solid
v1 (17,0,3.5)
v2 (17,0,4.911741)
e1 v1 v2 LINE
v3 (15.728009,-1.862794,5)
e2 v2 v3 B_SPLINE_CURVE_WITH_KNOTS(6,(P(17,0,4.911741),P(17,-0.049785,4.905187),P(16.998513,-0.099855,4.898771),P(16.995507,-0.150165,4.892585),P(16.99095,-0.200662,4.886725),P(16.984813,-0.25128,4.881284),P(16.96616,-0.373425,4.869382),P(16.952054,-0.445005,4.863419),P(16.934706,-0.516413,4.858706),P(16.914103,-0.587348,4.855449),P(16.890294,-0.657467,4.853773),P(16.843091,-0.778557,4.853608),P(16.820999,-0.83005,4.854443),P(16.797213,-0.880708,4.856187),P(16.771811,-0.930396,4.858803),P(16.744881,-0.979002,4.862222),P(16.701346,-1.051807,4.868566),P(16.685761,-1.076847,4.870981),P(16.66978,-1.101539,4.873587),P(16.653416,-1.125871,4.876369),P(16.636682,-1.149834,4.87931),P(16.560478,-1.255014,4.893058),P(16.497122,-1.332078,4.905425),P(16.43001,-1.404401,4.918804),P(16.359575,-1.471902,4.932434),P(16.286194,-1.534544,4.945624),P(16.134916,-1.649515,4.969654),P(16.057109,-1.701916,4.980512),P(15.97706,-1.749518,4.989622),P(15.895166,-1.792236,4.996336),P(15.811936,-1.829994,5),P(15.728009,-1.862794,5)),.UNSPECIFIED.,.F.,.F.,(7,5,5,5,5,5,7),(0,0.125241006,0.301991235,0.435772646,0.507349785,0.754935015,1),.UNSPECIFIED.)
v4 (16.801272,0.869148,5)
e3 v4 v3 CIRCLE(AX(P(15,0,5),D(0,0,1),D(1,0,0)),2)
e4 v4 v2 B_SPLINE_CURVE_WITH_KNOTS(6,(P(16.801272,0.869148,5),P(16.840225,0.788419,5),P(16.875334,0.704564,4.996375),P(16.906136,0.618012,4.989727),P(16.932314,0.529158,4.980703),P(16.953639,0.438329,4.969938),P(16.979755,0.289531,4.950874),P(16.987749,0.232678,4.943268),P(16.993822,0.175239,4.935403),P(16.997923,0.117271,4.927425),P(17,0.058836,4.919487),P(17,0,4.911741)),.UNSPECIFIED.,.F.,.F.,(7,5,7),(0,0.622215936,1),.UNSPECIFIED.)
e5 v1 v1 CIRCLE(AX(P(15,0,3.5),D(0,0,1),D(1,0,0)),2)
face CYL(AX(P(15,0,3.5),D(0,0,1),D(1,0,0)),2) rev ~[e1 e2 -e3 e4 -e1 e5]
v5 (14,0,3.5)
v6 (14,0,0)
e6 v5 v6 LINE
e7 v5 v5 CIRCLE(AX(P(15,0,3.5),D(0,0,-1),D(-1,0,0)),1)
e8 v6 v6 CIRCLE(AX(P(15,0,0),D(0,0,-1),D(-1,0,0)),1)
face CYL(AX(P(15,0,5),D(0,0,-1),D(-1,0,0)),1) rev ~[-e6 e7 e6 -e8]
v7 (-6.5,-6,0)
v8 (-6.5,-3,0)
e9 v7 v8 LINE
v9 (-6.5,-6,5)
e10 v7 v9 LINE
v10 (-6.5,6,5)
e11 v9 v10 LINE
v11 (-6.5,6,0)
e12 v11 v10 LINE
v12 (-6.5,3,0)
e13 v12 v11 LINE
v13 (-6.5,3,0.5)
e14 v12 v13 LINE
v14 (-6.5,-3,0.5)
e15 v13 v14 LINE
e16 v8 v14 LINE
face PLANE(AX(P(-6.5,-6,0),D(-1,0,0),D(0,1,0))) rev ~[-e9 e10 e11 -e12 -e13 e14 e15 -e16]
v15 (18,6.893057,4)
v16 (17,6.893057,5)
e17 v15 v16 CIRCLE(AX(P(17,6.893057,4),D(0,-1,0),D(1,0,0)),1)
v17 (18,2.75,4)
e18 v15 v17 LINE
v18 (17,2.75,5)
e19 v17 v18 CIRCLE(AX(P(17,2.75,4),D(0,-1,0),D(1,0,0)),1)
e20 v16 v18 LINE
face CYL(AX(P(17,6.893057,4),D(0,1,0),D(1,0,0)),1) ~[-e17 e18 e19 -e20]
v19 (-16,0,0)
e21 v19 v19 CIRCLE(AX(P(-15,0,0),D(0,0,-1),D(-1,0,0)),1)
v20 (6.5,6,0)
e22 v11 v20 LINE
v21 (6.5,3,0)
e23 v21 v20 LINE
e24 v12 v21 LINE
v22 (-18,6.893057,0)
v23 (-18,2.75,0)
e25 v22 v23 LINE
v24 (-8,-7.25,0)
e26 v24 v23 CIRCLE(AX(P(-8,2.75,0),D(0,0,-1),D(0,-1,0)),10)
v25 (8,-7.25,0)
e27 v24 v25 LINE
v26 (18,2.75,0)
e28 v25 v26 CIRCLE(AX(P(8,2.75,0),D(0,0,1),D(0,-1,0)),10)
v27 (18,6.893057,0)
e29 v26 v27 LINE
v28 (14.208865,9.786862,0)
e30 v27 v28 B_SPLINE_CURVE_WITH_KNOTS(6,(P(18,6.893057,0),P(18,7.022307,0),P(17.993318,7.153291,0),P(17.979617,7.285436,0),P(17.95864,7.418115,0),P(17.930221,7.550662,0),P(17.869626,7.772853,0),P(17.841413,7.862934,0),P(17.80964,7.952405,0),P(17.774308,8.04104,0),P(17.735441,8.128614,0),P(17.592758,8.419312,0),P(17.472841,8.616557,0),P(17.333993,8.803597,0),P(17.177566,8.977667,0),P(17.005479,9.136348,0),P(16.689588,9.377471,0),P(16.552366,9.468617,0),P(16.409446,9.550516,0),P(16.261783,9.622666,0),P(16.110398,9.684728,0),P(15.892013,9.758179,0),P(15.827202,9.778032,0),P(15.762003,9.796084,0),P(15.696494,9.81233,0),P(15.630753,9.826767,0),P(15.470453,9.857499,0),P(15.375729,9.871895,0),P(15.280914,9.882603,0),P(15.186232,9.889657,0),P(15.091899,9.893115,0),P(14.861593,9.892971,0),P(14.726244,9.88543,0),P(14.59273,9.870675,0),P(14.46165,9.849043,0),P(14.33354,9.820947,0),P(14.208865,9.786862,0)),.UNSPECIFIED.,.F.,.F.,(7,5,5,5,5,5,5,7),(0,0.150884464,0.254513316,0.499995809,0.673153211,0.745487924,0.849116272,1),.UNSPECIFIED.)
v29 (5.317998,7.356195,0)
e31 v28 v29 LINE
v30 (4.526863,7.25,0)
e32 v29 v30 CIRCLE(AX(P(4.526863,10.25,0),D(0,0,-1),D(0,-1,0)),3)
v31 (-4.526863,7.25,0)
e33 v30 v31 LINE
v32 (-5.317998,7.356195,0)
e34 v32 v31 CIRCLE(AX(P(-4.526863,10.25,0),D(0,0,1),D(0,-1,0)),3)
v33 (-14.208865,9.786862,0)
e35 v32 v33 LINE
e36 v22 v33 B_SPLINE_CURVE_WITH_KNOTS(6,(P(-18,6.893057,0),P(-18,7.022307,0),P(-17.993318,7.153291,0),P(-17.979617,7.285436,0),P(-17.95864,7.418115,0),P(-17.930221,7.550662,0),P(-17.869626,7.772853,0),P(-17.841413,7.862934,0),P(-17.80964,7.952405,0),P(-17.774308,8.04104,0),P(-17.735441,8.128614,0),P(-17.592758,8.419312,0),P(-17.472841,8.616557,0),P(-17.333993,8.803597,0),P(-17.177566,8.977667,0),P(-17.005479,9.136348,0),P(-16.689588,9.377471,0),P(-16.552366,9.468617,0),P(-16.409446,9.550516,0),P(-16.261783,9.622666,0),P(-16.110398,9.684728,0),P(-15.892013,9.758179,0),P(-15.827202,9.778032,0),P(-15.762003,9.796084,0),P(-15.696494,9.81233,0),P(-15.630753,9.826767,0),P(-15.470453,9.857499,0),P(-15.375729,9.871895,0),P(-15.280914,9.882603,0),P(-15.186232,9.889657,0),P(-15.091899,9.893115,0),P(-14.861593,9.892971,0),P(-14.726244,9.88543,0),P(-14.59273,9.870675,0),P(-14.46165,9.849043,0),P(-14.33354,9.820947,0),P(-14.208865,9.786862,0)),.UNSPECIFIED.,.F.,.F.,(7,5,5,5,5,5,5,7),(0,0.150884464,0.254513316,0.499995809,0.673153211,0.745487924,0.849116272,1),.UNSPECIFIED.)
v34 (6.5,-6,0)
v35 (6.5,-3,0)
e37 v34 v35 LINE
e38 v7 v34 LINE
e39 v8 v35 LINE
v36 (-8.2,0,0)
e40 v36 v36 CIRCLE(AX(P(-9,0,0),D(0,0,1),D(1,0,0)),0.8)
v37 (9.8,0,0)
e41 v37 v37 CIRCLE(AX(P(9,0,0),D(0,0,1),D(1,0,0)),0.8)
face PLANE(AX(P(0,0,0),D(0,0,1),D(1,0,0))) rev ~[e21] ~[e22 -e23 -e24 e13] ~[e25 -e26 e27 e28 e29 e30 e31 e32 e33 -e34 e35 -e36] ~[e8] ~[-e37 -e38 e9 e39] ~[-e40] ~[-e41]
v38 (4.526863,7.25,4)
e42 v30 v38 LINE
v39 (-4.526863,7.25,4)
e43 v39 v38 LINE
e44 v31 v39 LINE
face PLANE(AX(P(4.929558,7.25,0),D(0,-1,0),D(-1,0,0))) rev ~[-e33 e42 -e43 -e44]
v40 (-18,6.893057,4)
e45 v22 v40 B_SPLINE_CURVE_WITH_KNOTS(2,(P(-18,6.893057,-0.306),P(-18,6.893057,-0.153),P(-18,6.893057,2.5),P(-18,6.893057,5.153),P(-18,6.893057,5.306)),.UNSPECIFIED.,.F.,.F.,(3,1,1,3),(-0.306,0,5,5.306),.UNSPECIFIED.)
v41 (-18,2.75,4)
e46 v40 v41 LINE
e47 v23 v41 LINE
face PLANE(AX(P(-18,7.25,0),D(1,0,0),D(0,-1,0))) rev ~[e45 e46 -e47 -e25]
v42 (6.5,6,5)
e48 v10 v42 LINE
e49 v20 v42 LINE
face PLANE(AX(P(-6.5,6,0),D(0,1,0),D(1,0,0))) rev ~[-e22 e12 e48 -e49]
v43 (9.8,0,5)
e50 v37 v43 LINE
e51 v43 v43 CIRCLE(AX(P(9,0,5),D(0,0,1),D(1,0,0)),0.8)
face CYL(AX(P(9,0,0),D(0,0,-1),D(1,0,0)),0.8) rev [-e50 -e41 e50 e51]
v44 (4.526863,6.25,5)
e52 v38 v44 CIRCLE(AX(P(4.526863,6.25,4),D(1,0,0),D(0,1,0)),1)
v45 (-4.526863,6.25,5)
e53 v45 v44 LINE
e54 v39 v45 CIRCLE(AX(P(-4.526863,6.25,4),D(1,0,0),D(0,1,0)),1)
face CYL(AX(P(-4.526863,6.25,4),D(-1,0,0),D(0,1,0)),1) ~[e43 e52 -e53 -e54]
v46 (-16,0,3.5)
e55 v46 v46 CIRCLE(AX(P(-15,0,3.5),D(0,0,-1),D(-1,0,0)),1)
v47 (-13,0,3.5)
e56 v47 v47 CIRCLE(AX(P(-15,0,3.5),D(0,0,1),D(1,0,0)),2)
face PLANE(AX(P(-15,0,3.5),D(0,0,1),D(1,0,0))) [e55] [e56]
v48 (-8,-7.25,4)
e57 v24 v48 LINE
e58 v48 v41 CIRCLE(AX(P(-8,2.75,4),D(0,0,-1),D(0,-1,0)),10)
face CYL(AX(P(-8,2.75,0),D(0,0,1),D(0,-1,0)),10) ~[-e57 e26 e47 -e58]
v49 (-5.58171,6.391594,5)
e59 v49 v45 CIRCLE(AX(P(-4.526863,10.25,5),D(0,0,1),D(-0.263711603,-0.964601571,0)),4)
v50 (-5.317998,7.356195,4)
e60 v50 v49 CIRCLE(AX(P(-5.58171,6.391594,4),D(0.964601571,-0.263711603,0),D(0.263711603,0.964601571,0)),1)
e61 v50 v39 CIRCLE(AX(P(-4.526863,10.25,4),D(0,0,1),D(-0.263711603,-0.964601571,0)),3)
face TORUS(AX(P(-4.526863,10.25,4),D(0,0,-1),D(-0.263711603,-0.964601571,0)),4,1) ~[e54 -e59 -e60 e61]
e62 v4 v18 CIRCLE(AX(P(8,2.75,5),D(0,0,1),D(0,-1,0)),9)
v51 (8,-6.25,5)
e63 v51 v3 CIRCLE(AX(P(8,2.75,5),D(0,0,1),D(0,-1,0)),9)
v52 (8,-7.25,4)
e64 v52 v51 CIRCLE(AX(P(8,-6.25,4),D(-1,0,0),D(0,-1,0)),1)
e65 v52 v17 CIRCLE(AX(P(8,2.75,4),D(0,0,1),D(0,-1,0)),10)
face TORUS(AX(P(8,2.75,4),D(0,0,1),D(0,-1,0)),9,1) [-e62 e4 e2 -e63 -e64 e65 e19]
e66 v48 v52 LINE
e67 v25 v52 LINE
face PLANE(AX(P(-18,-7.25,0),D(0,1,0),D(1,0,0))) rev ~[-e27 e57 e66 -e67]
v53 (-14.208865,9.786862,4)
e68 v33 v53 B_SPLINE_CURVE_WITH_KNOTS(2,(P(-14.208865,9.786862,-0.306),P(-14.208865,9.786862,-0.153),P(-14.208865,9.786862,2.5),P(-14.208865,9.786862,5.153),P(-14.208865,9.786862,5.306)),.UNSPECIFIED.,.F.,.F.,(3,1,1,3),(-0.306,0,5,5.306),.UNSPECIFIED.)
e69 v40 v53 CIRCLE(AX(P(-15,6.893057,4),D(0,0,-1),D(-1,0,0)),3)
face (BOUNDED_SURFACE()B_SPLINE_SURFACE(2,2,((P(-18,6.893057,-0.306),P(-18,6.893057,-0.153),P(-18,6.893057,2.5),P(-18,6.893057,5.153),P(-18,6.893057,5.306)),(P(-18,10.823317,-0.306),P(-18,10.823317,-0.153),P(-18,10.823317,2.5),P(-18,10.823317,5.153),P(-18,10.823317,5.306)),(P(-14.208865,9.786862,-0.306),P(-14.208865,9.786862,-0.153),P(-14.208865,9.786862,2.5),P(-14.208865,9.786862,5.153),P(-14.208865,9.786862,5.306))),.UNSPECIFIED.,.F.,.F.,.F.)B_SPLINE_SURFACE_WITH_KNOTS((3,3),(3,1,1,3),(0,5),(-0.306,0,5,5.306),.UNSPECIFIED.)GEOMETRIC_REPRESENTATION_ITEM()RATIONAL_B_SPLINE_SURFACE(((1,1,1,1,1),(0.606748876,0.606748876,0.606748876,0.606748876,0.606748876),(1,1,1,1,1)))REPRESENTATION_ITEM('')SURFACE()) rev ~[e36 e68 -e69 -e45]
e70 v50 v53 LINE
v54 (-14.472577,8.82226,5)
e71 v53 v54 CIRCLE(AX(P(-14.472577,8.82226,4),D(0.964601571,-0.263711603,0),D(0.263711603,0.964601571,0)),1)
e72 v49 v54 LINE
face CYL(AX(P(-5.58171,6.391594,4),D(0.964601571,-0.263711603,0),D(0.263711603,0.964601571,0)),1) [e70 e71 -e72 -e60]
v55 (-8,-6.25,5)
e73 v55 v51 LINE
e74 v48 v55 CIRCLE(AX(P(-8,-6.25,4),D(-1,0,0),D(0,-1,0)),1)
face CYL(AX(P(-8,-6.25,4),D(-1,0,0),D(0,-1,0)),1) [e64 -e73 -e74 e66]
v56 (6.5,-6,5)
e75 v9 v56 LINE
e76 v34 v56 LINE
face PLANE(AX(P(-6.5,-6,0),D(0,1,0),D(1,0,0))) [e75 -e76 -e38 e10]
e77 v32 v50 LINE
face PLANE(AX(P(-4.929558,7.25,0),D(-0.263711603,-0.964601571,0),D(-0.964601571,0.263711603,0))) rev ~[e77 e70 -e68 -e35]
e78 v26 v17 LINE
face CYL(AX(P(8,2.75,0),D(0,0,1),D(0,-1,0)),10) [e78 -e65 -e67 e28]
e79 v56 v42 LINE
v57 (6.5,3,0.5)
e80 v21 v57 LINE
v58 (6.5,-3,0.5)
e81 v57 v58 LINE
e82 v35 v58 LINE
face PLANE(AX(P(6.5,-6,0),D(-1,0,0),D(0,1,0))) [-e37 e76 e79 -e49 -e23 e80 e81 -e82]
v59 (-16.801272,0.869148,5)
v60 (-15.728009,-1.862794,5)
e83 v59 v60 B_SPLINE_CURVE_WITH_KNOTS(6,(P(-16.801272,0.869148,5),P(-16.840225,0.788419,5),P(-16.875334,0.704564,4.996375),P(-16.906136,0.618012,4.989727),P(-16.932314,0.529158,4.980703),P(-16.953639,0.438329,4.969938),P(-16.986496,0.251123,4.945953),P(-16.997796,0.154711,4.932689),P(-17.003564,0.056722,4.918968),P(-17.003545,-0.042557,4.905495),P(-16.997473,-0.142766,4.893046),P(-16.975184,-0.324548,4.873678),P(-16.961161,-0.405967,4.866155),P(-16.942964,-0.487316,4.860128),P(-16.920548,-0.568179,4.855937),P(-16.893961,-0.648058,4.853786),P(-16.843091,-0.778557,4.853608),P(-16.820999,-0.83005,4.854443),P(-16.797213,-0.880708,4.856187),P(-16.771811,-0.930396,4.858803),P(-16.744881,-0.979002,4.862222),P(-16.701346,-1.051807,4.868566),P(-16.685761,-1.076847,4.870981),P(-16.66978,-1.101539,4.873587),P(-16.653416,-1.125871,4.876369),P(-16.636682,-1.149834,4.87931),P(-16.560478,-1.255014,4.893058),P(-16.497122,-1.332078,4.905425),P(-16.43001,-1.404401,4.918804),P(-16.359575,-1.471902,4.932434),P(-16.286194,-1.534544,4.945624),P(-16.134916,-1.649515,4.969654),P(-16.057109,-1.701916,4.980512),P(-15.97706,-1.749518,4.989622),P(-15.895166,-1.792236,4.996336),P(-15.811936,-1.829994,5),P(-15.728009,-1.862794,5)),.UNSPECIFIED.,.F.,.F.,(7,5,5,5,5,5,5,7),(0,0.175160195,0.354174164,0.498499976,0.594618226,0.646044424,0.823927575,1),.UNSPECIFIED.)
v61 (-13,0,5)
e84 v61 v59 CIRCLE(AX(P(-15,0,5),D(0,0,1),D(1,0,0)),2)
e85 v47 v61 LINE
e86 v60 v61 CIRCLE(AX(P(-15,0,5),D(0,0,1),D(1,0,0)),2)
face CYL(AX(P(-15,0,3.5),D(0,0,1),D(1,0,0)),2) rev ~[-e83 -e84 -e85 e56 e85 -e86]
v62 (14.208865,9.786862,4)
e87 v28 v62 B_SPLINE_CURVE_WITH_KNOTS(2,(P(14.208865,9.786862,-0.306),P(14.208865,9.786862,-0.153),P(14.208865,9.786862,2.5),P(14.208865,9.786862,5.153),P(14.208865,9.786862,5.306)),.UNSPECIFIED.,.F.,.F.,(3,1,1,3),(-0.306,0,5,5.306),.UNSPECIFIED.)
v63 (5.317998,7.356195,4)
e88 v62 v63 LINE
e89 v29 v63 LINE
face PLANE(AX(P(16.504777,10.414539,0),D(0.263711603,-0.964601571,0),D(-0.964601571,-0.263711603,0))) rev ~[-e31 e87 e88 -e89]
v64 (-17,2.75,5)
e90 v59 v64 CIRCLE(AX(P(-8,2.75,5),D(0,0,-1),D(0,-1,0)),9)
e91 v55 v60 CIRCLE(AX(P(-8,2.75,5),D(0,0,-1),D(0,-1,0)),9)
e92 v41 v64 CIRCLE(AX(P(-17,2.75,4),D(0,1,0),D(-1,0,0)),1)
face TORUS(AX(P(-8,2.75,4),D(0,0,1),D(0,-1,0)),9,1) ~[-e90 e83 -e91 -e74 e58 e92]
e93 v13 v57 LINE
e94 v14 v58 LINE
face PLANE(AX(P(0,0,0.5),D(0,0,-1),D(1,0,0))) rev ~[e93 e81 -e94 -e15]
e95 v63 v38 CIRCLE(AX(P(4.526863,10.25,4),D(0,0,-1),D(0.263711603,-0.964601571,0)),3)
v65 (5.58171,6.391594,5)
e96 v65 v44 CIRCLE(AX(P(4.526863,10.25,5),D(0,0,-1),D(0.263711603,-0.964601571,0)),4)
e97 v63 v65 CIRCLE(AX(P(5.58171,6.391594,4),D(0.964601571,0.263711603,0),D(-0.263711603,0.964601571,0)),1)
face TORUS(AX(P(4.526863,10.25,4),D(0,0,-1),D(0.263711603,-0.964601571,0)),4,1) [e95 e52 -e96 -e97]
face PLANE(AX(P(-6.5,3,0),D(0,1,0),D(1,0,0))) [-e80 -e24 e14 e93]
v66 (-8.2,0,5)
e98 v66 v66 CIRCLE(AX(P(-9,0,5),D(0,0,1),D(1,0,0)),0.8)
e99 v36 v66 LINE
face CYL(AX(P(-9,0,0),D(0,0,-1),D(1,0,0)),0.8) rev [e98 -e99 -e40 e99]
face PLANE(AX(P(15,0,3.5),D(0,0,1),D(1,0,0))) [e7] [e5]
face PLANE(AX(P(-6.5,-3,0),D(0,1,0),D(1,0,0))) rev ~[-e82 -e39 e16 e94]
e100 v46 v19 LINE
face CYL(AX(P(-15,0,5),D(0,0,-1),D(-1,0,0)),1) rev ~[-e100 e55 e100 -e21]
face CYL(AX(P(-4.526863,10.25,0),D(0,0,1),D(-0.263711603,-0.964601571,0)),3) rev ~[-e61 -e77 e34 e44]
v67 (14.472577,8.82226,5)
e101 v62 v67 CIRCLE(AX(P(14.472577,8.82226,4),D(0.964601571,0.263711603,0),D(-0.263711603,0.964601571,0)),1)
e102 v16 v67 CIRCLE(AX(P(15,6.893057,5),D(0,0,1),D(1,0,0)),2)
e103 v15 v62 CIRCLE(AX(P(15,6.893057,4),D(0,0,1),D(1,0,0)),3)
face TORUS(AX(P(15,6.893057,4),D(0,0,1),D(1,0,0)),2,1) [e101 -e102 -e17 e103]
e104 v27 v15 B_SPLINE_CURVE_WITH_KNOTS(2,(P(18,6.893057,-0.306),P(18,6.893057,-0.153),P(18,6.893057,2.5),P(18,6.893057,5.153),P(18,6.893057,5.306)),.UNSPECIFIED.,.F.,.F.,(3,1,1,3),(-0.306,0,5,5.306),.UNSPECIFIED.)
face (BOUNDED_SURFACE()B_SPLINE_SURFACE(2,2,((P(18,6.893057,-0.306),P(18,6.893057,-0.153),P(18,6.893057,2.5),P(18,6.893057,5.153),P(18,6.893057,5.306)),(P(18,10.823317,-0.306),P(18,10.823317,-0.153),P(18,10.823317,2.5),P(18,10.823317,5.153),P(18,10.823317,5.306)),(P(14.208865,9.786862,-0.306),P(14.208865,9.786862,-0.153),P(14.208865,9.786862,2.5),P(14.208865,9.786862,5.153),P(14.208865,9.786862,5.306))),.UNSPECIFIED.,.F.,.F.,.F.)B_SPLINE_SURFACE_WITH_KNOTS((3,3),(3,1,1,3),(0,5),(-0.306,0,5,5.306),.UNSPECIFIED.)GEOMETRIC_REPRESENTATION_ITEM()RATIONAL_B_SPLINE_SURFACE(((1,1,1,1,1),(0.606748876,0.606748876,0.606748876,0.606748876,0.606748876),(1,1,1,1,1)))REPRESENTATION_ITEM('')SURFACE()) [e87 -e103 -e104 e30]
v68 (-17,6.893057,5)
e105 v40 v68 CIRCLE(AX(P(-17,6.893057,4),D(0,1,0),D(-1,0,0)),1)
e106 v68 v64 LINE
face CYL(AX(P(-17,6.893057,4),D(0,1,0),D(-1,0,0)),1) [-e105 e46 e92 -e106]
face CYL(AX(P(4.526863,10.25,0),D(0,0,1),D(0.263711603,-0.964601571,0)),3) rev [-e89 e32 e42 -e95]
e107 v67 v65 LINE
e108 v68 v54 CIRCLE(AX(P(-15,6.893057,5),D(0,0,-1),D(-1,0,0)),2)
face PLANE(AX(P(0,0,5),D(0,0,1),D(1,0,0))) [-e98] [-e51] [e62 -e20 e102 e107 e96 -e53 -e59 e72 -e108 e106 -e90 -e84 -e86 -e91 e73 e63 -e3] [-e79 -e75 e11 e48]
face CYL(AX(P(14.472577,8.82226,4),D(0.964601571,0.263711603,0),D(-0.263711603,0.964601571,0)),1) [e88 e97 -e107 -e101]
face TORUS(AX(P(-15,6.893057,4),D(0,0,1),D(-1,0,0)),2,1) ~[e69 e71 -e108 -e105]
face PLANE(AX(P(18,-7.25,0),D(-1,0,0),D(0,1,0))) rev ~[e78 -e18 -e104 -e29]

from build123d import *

# Parameters (mm, degrees)
F0_R           = 0.8
F0_W           = 13
F0_H           = 12
F1_DEPTH       = 5
F2_W           = 13
F2_H           = 6
F3_DEPTH       = 0.5
F5_D           = 2
F5_DEPTH       = 20
F5_CBORE_D     = 4
F5_CBORE_DEPTH = 1.5
F5_TIP         = 0.600860619
F6_R           = 10
F7_R           = 3
F8_T1_DEPTH    = 4.1430571099
F8_T3_DEPTH    = 9.217139142
F8_T5_DEPTH    = 16
F8_T7_DEPTH    = 9.0537269763
F8_T9_DEPTH    = 9.217139142
F8_T12_ANGLE   = 90
F8_T14_ANGLE   = 105.2904097565
F8_T16_ANGLE   = 90
F8_T18_ANGLE   = 15.2904100724
F8_T20_ANGLE   = 15.2904100724
F8_T22_ANGLE   = 105.2904094573


# Not quite as in the source:
# - a fillet or chamfer that OpenCascade refuses, or shapes differently, is made with other operations: its cross-section is extruded or revolved along the edge and cut away or added


with BuildPart() as f1:
    # F0 (on Top) → F1 (new body)
    with BuildSketch(Plane.XY):
        Polygon((-18, -7.25), (18, -7.25), (18, 7.25), (4.9295582736, 7.25), (-4.9295582736, 7.25), (-18, 7.25), align=None)
        with Locations((-9, 0)):
            Circle(F0_R, mode=Mode.SUBTRACT)
        Rectangle(F0_W, F0_H, mode=Mode.SUBTRACT)
        with Locations((9, 0)):
            Circle(F0_R, mode=Mode.SUBTRACT)
        with BuildLine():
            Line((4.9295582736, 7.25), (18, 7.25))
            ThreePointArc((18, 7.25), (17.6073787038, 9), (16.5047771245, 10.4145392323))
            Line((16.5047771245, 10.4145392323), (4.9295582736, 7.25))
        make_face()
        with BuildLine():
            ThreePointArc((-16.5047771245, 10.4145392323), (-17.6073787038, 9), (-18, 7.25))
            Line((-18, 7.25), (-4.9295582736, 7.25))
            Line((-4.9295582736, 7.25), (-16.5047771245, 10.4145392323))
        make_face()
    extrude(amount=F1_DEPTH)

    # F2 (on face) → F3 (join)
    with BuildSketch(Plane(origin=(0, 0, 0), x_dir=(1, 0, 0), z_dir=(0, 0, -1))):
        Rectangle(F2_W, F2_H)
    extrude(amount=-F3_DEPTH)

    # F5
    with Locations(Plane.XY.offset(5)):
        with Locations((-15, 0), (15, 0)):
            CounterBoreHole(F5_D / 2, F5_CBORE_D / 2, F5_CBORE_DEPTH, depth=F5_DEPTH)
            with Locations((0, 0, -(F5_DEPTH + F5_TIP / 2))):  # 118° drill point
                Cone(0, F5_D / 2, F5_TIP, mode=Mode.SUBTRACT)

    # F6
    f6_edges = [f1.edges().sort_by_distance(p)[0] for p in [
        (-18, -7.25, 2.5),
        (18, -7.25, 2.5),
    ]]
    fillet(f6_edges, radius=F6_R)

    # F7
    f7_edges = [f1.edges().sort_by_distance(p)[0] for p in [
        (-16.504777, 10.414539, 2.5),
        (16.504777, 10.414539, 2.5),
        (-4.929558, 7.25, 2.5),
        (4.929558, 7.25, 2.5),
    ]]
    fillet(f7_edges, radius=F7_R)

    # F8: fillet of radius 1 on 12 edges, made by hand

    # F8_s2 → F8_t1 (cut)
    with BuildSketch(Plane.XZ.offset(-6.8930571099)):
        with BuildLine():
            ThreePointArc((-18, 4), (-17.7071067812, 4.7071067812), (-17, 5))
            Line((-17, 5), (-18, 5))
            Line((-18, 5), (-18, 4))
        make_face()
        with BuildLine():
            ThreePointArc((18, 4), (17.7071067812, 4.7071067812), (17, 5))
            Line((17, 5), (18, 5))
            Line((18, 5), (18, 4))
        make_face()
    extrude(amount=F8_T1_DEPTH, mode=Mode.SUBTRACT)

    # F8_s4 → F8_t3 (cut)
    with BuildSketch(Plane(origin=(-6.8194085753, 1.8643523078, 0), x_dir=(0, 0, 1), z_dir=(-0.9646015709, 0.2637116027, 0))):
        with BuildLine():
            ThreePointArc((4, 5.6933796762), (4.7071067812, 5.4004864574), (5, 4.6933796762))
            Line((5, 4.6933796762), (5, 5.6933796762))
            Line((5, 5.6933796762), (4, 5.6933796762))
        make_face()
    extrude(amount=F8_T3_DEPTH, mode=Mode.SUBTRACT)

    # F8_s6 → F8_t5 (cut)
    with BuildSketch(Plane.YZ.offset(-8)):
        with BuildLine():
            ThreePointArc((-7.25, 4), (-6.9571067812, 4.7071067812), (-6.25, 5))
            Line((-6.25, 5), (-7.25, 5))
            Line((-7.25, 5), (-7.25, 4))
        make_face()
    extrude(amount=F8_T5_DEPTH, mode=Mode.SUBTRACT)

    # F8_s8 → F8_t7 (cut)
    with BuildSketch(Plane.YZ.offset(-4.5268634881)):
        with BuildLine():
            ThreePointArc((7.25, 4), (6.9571067812, 4.7071067812), (6.25, 5))
            Line((6.25, 5), (7.25, 5))
            Line((7.25, 5), (7.25, 4))
        make_face()
    extrude(amount=F8_T7_DEPTH, mode=Mode.SUBTRACT)

    # F8_s10 → F8_t9 (cut)
    with BuildSketch(Plane(origin=(15.7102754711, 4.2950188431, 0), x_dir=(0, 0, 1), z_dir=(-0.9646015709, -0.2637116027, 0))):
        with BuildLine():
            ThreePointArc((4, 5.6933796762), (4.7071067812, 5.4004864574), (5, 4.6933796762))
            Line((5, 4.6933796762), (5, 5.6933796762))
            Line((5, 5.6933796762), (4, 5.6933796762))
        make_face()
    extrude(amount=F8_T9_DEPTH, mode=Mode.SUBTRACT)

    # F8_s11 → F8_t12 (revolve, cut)
    with BuildSketch(Plane.YZ.offset(8)):
        with BuildLine():
            ThreePointArc((-7.25, 4), (-6.9571067812, 4.7071067812), (-6.25, 5))
            Line((-6.25, 5), (-7.25, 5))
            Line((-7.25, 5), (-7.25, 4))
        make_face()
    revolve(axis=Axis((8, 2.75, 5), (0, 0, 1)), revolution_arc=F8_T12_ANGLE, mode=Mode.SUBTRACT)

    # F8_s13 → F8_t14 (revolve, cut)
    with BuildSketch(Plane.XZ.offset(-6.8930571003)):
        with BuildLine():
            ThreePointArc((-18.0000000058, 4), (-17.707106787, 4.7071067812), (-17.0000000058, 5))
            Line((-17.0000000058, 5), (-18, 5))
            Line((-18, 5), (-18.0000000058, 4))
        make_face()
    revolve(axis=Axis((-14.9999999954, 6.8930571003, 5), (0, 0, -1)), revolution_arc=F8_T14_ANGLE, mode=Mode.SUBTRACT)

    # F8_s15 → F8_t16 (revolve, cut)
    with BuildSketch(Plane.YZ.offset(-8)):
        with BuildLine():
            ThreePointArc((-7.25, 4), (-6.9571067812, 4.7071067812), (-6.25, 5))
            Line((-6.25, 5), (-7.25, 5))
            Line((-7.25, 5), (-7.25, 4))
        make_face()
    revolve(axis=Axis((-8, 2.75, 5), (0, 0, -1)), revolution_arc=F8_T16_ANGLE, mode=Mode.SUBTRACT)

    # F8_s17 → F8_t18 (revolve, cut)
    with BuildSketch(Plane(origin=(-6.8194085753, 1.8643523078, 0), x_dir=(0, 0, 1), z_dir=(-0.9646015709, 0.2637116027, 0))):
        with BuildLine():
            ThreePointArc((4, 5.6933796762), (4.7071067812, 5.4004864574), (5, 4.6933796762))
            Line((5, 4.6933796762), (5, 5.6933796762))
            Line((5, 5.6933796762), (4, 5.6933796762))
        make_face()
    revolve(axis=Axis((-4.5268634881, 10.25, 5), (0, 0, 1)), revolution_arc=F8_T18_ANGLE, mode=Mode.SUBTRACT)

    # F8_s19 → F8_t20 (revolve, cut)
    with BuildSketch(Plane(origin=(6.8194085753, 1.8643523078, 0), x_dir=(0, 0, 1), z_dir=(0.9646015709, 0.2637116027, 0))):
        with BuildLine():
            ThreePointArc((4, -5.6933796762), (4.7071067812, -5.4004864574), (5, -4.6933796762))
            Line((5, -4.6933796762), (5, -5.6933796762))
            Line((5, -5.6933796762), (4, -5.6933796762))
        make_face()
    revolve(axis=Axis((4.5268634881, 10.25, 5), (0, 0, -1)), revolution_arc=F8_T20_ANGLE, mode=Mode.SUBTRACT)

    # F8_s21 → F8_t22 (revolve, cut)
    with BuildSketch(Plane.XZ.offset(-6.8930570951)):
        with BuildLine():
            ThreePointArc((18.0000000063, 4), (17.7071067875, 4.7071067812), (17.0000000063, 5))
            Line((17.0000000063, 5), (18, 5))
            Line((18, 5), (18.0000000063, 4))
        make_face()
    revolve(axis=Axis((14.999999986, 6.8930570951, 5), (0, 0, 1)), revolution_arc=F8_T22_ANGLE, mode=Mode.SUBTRACT)


solid = f1.part
